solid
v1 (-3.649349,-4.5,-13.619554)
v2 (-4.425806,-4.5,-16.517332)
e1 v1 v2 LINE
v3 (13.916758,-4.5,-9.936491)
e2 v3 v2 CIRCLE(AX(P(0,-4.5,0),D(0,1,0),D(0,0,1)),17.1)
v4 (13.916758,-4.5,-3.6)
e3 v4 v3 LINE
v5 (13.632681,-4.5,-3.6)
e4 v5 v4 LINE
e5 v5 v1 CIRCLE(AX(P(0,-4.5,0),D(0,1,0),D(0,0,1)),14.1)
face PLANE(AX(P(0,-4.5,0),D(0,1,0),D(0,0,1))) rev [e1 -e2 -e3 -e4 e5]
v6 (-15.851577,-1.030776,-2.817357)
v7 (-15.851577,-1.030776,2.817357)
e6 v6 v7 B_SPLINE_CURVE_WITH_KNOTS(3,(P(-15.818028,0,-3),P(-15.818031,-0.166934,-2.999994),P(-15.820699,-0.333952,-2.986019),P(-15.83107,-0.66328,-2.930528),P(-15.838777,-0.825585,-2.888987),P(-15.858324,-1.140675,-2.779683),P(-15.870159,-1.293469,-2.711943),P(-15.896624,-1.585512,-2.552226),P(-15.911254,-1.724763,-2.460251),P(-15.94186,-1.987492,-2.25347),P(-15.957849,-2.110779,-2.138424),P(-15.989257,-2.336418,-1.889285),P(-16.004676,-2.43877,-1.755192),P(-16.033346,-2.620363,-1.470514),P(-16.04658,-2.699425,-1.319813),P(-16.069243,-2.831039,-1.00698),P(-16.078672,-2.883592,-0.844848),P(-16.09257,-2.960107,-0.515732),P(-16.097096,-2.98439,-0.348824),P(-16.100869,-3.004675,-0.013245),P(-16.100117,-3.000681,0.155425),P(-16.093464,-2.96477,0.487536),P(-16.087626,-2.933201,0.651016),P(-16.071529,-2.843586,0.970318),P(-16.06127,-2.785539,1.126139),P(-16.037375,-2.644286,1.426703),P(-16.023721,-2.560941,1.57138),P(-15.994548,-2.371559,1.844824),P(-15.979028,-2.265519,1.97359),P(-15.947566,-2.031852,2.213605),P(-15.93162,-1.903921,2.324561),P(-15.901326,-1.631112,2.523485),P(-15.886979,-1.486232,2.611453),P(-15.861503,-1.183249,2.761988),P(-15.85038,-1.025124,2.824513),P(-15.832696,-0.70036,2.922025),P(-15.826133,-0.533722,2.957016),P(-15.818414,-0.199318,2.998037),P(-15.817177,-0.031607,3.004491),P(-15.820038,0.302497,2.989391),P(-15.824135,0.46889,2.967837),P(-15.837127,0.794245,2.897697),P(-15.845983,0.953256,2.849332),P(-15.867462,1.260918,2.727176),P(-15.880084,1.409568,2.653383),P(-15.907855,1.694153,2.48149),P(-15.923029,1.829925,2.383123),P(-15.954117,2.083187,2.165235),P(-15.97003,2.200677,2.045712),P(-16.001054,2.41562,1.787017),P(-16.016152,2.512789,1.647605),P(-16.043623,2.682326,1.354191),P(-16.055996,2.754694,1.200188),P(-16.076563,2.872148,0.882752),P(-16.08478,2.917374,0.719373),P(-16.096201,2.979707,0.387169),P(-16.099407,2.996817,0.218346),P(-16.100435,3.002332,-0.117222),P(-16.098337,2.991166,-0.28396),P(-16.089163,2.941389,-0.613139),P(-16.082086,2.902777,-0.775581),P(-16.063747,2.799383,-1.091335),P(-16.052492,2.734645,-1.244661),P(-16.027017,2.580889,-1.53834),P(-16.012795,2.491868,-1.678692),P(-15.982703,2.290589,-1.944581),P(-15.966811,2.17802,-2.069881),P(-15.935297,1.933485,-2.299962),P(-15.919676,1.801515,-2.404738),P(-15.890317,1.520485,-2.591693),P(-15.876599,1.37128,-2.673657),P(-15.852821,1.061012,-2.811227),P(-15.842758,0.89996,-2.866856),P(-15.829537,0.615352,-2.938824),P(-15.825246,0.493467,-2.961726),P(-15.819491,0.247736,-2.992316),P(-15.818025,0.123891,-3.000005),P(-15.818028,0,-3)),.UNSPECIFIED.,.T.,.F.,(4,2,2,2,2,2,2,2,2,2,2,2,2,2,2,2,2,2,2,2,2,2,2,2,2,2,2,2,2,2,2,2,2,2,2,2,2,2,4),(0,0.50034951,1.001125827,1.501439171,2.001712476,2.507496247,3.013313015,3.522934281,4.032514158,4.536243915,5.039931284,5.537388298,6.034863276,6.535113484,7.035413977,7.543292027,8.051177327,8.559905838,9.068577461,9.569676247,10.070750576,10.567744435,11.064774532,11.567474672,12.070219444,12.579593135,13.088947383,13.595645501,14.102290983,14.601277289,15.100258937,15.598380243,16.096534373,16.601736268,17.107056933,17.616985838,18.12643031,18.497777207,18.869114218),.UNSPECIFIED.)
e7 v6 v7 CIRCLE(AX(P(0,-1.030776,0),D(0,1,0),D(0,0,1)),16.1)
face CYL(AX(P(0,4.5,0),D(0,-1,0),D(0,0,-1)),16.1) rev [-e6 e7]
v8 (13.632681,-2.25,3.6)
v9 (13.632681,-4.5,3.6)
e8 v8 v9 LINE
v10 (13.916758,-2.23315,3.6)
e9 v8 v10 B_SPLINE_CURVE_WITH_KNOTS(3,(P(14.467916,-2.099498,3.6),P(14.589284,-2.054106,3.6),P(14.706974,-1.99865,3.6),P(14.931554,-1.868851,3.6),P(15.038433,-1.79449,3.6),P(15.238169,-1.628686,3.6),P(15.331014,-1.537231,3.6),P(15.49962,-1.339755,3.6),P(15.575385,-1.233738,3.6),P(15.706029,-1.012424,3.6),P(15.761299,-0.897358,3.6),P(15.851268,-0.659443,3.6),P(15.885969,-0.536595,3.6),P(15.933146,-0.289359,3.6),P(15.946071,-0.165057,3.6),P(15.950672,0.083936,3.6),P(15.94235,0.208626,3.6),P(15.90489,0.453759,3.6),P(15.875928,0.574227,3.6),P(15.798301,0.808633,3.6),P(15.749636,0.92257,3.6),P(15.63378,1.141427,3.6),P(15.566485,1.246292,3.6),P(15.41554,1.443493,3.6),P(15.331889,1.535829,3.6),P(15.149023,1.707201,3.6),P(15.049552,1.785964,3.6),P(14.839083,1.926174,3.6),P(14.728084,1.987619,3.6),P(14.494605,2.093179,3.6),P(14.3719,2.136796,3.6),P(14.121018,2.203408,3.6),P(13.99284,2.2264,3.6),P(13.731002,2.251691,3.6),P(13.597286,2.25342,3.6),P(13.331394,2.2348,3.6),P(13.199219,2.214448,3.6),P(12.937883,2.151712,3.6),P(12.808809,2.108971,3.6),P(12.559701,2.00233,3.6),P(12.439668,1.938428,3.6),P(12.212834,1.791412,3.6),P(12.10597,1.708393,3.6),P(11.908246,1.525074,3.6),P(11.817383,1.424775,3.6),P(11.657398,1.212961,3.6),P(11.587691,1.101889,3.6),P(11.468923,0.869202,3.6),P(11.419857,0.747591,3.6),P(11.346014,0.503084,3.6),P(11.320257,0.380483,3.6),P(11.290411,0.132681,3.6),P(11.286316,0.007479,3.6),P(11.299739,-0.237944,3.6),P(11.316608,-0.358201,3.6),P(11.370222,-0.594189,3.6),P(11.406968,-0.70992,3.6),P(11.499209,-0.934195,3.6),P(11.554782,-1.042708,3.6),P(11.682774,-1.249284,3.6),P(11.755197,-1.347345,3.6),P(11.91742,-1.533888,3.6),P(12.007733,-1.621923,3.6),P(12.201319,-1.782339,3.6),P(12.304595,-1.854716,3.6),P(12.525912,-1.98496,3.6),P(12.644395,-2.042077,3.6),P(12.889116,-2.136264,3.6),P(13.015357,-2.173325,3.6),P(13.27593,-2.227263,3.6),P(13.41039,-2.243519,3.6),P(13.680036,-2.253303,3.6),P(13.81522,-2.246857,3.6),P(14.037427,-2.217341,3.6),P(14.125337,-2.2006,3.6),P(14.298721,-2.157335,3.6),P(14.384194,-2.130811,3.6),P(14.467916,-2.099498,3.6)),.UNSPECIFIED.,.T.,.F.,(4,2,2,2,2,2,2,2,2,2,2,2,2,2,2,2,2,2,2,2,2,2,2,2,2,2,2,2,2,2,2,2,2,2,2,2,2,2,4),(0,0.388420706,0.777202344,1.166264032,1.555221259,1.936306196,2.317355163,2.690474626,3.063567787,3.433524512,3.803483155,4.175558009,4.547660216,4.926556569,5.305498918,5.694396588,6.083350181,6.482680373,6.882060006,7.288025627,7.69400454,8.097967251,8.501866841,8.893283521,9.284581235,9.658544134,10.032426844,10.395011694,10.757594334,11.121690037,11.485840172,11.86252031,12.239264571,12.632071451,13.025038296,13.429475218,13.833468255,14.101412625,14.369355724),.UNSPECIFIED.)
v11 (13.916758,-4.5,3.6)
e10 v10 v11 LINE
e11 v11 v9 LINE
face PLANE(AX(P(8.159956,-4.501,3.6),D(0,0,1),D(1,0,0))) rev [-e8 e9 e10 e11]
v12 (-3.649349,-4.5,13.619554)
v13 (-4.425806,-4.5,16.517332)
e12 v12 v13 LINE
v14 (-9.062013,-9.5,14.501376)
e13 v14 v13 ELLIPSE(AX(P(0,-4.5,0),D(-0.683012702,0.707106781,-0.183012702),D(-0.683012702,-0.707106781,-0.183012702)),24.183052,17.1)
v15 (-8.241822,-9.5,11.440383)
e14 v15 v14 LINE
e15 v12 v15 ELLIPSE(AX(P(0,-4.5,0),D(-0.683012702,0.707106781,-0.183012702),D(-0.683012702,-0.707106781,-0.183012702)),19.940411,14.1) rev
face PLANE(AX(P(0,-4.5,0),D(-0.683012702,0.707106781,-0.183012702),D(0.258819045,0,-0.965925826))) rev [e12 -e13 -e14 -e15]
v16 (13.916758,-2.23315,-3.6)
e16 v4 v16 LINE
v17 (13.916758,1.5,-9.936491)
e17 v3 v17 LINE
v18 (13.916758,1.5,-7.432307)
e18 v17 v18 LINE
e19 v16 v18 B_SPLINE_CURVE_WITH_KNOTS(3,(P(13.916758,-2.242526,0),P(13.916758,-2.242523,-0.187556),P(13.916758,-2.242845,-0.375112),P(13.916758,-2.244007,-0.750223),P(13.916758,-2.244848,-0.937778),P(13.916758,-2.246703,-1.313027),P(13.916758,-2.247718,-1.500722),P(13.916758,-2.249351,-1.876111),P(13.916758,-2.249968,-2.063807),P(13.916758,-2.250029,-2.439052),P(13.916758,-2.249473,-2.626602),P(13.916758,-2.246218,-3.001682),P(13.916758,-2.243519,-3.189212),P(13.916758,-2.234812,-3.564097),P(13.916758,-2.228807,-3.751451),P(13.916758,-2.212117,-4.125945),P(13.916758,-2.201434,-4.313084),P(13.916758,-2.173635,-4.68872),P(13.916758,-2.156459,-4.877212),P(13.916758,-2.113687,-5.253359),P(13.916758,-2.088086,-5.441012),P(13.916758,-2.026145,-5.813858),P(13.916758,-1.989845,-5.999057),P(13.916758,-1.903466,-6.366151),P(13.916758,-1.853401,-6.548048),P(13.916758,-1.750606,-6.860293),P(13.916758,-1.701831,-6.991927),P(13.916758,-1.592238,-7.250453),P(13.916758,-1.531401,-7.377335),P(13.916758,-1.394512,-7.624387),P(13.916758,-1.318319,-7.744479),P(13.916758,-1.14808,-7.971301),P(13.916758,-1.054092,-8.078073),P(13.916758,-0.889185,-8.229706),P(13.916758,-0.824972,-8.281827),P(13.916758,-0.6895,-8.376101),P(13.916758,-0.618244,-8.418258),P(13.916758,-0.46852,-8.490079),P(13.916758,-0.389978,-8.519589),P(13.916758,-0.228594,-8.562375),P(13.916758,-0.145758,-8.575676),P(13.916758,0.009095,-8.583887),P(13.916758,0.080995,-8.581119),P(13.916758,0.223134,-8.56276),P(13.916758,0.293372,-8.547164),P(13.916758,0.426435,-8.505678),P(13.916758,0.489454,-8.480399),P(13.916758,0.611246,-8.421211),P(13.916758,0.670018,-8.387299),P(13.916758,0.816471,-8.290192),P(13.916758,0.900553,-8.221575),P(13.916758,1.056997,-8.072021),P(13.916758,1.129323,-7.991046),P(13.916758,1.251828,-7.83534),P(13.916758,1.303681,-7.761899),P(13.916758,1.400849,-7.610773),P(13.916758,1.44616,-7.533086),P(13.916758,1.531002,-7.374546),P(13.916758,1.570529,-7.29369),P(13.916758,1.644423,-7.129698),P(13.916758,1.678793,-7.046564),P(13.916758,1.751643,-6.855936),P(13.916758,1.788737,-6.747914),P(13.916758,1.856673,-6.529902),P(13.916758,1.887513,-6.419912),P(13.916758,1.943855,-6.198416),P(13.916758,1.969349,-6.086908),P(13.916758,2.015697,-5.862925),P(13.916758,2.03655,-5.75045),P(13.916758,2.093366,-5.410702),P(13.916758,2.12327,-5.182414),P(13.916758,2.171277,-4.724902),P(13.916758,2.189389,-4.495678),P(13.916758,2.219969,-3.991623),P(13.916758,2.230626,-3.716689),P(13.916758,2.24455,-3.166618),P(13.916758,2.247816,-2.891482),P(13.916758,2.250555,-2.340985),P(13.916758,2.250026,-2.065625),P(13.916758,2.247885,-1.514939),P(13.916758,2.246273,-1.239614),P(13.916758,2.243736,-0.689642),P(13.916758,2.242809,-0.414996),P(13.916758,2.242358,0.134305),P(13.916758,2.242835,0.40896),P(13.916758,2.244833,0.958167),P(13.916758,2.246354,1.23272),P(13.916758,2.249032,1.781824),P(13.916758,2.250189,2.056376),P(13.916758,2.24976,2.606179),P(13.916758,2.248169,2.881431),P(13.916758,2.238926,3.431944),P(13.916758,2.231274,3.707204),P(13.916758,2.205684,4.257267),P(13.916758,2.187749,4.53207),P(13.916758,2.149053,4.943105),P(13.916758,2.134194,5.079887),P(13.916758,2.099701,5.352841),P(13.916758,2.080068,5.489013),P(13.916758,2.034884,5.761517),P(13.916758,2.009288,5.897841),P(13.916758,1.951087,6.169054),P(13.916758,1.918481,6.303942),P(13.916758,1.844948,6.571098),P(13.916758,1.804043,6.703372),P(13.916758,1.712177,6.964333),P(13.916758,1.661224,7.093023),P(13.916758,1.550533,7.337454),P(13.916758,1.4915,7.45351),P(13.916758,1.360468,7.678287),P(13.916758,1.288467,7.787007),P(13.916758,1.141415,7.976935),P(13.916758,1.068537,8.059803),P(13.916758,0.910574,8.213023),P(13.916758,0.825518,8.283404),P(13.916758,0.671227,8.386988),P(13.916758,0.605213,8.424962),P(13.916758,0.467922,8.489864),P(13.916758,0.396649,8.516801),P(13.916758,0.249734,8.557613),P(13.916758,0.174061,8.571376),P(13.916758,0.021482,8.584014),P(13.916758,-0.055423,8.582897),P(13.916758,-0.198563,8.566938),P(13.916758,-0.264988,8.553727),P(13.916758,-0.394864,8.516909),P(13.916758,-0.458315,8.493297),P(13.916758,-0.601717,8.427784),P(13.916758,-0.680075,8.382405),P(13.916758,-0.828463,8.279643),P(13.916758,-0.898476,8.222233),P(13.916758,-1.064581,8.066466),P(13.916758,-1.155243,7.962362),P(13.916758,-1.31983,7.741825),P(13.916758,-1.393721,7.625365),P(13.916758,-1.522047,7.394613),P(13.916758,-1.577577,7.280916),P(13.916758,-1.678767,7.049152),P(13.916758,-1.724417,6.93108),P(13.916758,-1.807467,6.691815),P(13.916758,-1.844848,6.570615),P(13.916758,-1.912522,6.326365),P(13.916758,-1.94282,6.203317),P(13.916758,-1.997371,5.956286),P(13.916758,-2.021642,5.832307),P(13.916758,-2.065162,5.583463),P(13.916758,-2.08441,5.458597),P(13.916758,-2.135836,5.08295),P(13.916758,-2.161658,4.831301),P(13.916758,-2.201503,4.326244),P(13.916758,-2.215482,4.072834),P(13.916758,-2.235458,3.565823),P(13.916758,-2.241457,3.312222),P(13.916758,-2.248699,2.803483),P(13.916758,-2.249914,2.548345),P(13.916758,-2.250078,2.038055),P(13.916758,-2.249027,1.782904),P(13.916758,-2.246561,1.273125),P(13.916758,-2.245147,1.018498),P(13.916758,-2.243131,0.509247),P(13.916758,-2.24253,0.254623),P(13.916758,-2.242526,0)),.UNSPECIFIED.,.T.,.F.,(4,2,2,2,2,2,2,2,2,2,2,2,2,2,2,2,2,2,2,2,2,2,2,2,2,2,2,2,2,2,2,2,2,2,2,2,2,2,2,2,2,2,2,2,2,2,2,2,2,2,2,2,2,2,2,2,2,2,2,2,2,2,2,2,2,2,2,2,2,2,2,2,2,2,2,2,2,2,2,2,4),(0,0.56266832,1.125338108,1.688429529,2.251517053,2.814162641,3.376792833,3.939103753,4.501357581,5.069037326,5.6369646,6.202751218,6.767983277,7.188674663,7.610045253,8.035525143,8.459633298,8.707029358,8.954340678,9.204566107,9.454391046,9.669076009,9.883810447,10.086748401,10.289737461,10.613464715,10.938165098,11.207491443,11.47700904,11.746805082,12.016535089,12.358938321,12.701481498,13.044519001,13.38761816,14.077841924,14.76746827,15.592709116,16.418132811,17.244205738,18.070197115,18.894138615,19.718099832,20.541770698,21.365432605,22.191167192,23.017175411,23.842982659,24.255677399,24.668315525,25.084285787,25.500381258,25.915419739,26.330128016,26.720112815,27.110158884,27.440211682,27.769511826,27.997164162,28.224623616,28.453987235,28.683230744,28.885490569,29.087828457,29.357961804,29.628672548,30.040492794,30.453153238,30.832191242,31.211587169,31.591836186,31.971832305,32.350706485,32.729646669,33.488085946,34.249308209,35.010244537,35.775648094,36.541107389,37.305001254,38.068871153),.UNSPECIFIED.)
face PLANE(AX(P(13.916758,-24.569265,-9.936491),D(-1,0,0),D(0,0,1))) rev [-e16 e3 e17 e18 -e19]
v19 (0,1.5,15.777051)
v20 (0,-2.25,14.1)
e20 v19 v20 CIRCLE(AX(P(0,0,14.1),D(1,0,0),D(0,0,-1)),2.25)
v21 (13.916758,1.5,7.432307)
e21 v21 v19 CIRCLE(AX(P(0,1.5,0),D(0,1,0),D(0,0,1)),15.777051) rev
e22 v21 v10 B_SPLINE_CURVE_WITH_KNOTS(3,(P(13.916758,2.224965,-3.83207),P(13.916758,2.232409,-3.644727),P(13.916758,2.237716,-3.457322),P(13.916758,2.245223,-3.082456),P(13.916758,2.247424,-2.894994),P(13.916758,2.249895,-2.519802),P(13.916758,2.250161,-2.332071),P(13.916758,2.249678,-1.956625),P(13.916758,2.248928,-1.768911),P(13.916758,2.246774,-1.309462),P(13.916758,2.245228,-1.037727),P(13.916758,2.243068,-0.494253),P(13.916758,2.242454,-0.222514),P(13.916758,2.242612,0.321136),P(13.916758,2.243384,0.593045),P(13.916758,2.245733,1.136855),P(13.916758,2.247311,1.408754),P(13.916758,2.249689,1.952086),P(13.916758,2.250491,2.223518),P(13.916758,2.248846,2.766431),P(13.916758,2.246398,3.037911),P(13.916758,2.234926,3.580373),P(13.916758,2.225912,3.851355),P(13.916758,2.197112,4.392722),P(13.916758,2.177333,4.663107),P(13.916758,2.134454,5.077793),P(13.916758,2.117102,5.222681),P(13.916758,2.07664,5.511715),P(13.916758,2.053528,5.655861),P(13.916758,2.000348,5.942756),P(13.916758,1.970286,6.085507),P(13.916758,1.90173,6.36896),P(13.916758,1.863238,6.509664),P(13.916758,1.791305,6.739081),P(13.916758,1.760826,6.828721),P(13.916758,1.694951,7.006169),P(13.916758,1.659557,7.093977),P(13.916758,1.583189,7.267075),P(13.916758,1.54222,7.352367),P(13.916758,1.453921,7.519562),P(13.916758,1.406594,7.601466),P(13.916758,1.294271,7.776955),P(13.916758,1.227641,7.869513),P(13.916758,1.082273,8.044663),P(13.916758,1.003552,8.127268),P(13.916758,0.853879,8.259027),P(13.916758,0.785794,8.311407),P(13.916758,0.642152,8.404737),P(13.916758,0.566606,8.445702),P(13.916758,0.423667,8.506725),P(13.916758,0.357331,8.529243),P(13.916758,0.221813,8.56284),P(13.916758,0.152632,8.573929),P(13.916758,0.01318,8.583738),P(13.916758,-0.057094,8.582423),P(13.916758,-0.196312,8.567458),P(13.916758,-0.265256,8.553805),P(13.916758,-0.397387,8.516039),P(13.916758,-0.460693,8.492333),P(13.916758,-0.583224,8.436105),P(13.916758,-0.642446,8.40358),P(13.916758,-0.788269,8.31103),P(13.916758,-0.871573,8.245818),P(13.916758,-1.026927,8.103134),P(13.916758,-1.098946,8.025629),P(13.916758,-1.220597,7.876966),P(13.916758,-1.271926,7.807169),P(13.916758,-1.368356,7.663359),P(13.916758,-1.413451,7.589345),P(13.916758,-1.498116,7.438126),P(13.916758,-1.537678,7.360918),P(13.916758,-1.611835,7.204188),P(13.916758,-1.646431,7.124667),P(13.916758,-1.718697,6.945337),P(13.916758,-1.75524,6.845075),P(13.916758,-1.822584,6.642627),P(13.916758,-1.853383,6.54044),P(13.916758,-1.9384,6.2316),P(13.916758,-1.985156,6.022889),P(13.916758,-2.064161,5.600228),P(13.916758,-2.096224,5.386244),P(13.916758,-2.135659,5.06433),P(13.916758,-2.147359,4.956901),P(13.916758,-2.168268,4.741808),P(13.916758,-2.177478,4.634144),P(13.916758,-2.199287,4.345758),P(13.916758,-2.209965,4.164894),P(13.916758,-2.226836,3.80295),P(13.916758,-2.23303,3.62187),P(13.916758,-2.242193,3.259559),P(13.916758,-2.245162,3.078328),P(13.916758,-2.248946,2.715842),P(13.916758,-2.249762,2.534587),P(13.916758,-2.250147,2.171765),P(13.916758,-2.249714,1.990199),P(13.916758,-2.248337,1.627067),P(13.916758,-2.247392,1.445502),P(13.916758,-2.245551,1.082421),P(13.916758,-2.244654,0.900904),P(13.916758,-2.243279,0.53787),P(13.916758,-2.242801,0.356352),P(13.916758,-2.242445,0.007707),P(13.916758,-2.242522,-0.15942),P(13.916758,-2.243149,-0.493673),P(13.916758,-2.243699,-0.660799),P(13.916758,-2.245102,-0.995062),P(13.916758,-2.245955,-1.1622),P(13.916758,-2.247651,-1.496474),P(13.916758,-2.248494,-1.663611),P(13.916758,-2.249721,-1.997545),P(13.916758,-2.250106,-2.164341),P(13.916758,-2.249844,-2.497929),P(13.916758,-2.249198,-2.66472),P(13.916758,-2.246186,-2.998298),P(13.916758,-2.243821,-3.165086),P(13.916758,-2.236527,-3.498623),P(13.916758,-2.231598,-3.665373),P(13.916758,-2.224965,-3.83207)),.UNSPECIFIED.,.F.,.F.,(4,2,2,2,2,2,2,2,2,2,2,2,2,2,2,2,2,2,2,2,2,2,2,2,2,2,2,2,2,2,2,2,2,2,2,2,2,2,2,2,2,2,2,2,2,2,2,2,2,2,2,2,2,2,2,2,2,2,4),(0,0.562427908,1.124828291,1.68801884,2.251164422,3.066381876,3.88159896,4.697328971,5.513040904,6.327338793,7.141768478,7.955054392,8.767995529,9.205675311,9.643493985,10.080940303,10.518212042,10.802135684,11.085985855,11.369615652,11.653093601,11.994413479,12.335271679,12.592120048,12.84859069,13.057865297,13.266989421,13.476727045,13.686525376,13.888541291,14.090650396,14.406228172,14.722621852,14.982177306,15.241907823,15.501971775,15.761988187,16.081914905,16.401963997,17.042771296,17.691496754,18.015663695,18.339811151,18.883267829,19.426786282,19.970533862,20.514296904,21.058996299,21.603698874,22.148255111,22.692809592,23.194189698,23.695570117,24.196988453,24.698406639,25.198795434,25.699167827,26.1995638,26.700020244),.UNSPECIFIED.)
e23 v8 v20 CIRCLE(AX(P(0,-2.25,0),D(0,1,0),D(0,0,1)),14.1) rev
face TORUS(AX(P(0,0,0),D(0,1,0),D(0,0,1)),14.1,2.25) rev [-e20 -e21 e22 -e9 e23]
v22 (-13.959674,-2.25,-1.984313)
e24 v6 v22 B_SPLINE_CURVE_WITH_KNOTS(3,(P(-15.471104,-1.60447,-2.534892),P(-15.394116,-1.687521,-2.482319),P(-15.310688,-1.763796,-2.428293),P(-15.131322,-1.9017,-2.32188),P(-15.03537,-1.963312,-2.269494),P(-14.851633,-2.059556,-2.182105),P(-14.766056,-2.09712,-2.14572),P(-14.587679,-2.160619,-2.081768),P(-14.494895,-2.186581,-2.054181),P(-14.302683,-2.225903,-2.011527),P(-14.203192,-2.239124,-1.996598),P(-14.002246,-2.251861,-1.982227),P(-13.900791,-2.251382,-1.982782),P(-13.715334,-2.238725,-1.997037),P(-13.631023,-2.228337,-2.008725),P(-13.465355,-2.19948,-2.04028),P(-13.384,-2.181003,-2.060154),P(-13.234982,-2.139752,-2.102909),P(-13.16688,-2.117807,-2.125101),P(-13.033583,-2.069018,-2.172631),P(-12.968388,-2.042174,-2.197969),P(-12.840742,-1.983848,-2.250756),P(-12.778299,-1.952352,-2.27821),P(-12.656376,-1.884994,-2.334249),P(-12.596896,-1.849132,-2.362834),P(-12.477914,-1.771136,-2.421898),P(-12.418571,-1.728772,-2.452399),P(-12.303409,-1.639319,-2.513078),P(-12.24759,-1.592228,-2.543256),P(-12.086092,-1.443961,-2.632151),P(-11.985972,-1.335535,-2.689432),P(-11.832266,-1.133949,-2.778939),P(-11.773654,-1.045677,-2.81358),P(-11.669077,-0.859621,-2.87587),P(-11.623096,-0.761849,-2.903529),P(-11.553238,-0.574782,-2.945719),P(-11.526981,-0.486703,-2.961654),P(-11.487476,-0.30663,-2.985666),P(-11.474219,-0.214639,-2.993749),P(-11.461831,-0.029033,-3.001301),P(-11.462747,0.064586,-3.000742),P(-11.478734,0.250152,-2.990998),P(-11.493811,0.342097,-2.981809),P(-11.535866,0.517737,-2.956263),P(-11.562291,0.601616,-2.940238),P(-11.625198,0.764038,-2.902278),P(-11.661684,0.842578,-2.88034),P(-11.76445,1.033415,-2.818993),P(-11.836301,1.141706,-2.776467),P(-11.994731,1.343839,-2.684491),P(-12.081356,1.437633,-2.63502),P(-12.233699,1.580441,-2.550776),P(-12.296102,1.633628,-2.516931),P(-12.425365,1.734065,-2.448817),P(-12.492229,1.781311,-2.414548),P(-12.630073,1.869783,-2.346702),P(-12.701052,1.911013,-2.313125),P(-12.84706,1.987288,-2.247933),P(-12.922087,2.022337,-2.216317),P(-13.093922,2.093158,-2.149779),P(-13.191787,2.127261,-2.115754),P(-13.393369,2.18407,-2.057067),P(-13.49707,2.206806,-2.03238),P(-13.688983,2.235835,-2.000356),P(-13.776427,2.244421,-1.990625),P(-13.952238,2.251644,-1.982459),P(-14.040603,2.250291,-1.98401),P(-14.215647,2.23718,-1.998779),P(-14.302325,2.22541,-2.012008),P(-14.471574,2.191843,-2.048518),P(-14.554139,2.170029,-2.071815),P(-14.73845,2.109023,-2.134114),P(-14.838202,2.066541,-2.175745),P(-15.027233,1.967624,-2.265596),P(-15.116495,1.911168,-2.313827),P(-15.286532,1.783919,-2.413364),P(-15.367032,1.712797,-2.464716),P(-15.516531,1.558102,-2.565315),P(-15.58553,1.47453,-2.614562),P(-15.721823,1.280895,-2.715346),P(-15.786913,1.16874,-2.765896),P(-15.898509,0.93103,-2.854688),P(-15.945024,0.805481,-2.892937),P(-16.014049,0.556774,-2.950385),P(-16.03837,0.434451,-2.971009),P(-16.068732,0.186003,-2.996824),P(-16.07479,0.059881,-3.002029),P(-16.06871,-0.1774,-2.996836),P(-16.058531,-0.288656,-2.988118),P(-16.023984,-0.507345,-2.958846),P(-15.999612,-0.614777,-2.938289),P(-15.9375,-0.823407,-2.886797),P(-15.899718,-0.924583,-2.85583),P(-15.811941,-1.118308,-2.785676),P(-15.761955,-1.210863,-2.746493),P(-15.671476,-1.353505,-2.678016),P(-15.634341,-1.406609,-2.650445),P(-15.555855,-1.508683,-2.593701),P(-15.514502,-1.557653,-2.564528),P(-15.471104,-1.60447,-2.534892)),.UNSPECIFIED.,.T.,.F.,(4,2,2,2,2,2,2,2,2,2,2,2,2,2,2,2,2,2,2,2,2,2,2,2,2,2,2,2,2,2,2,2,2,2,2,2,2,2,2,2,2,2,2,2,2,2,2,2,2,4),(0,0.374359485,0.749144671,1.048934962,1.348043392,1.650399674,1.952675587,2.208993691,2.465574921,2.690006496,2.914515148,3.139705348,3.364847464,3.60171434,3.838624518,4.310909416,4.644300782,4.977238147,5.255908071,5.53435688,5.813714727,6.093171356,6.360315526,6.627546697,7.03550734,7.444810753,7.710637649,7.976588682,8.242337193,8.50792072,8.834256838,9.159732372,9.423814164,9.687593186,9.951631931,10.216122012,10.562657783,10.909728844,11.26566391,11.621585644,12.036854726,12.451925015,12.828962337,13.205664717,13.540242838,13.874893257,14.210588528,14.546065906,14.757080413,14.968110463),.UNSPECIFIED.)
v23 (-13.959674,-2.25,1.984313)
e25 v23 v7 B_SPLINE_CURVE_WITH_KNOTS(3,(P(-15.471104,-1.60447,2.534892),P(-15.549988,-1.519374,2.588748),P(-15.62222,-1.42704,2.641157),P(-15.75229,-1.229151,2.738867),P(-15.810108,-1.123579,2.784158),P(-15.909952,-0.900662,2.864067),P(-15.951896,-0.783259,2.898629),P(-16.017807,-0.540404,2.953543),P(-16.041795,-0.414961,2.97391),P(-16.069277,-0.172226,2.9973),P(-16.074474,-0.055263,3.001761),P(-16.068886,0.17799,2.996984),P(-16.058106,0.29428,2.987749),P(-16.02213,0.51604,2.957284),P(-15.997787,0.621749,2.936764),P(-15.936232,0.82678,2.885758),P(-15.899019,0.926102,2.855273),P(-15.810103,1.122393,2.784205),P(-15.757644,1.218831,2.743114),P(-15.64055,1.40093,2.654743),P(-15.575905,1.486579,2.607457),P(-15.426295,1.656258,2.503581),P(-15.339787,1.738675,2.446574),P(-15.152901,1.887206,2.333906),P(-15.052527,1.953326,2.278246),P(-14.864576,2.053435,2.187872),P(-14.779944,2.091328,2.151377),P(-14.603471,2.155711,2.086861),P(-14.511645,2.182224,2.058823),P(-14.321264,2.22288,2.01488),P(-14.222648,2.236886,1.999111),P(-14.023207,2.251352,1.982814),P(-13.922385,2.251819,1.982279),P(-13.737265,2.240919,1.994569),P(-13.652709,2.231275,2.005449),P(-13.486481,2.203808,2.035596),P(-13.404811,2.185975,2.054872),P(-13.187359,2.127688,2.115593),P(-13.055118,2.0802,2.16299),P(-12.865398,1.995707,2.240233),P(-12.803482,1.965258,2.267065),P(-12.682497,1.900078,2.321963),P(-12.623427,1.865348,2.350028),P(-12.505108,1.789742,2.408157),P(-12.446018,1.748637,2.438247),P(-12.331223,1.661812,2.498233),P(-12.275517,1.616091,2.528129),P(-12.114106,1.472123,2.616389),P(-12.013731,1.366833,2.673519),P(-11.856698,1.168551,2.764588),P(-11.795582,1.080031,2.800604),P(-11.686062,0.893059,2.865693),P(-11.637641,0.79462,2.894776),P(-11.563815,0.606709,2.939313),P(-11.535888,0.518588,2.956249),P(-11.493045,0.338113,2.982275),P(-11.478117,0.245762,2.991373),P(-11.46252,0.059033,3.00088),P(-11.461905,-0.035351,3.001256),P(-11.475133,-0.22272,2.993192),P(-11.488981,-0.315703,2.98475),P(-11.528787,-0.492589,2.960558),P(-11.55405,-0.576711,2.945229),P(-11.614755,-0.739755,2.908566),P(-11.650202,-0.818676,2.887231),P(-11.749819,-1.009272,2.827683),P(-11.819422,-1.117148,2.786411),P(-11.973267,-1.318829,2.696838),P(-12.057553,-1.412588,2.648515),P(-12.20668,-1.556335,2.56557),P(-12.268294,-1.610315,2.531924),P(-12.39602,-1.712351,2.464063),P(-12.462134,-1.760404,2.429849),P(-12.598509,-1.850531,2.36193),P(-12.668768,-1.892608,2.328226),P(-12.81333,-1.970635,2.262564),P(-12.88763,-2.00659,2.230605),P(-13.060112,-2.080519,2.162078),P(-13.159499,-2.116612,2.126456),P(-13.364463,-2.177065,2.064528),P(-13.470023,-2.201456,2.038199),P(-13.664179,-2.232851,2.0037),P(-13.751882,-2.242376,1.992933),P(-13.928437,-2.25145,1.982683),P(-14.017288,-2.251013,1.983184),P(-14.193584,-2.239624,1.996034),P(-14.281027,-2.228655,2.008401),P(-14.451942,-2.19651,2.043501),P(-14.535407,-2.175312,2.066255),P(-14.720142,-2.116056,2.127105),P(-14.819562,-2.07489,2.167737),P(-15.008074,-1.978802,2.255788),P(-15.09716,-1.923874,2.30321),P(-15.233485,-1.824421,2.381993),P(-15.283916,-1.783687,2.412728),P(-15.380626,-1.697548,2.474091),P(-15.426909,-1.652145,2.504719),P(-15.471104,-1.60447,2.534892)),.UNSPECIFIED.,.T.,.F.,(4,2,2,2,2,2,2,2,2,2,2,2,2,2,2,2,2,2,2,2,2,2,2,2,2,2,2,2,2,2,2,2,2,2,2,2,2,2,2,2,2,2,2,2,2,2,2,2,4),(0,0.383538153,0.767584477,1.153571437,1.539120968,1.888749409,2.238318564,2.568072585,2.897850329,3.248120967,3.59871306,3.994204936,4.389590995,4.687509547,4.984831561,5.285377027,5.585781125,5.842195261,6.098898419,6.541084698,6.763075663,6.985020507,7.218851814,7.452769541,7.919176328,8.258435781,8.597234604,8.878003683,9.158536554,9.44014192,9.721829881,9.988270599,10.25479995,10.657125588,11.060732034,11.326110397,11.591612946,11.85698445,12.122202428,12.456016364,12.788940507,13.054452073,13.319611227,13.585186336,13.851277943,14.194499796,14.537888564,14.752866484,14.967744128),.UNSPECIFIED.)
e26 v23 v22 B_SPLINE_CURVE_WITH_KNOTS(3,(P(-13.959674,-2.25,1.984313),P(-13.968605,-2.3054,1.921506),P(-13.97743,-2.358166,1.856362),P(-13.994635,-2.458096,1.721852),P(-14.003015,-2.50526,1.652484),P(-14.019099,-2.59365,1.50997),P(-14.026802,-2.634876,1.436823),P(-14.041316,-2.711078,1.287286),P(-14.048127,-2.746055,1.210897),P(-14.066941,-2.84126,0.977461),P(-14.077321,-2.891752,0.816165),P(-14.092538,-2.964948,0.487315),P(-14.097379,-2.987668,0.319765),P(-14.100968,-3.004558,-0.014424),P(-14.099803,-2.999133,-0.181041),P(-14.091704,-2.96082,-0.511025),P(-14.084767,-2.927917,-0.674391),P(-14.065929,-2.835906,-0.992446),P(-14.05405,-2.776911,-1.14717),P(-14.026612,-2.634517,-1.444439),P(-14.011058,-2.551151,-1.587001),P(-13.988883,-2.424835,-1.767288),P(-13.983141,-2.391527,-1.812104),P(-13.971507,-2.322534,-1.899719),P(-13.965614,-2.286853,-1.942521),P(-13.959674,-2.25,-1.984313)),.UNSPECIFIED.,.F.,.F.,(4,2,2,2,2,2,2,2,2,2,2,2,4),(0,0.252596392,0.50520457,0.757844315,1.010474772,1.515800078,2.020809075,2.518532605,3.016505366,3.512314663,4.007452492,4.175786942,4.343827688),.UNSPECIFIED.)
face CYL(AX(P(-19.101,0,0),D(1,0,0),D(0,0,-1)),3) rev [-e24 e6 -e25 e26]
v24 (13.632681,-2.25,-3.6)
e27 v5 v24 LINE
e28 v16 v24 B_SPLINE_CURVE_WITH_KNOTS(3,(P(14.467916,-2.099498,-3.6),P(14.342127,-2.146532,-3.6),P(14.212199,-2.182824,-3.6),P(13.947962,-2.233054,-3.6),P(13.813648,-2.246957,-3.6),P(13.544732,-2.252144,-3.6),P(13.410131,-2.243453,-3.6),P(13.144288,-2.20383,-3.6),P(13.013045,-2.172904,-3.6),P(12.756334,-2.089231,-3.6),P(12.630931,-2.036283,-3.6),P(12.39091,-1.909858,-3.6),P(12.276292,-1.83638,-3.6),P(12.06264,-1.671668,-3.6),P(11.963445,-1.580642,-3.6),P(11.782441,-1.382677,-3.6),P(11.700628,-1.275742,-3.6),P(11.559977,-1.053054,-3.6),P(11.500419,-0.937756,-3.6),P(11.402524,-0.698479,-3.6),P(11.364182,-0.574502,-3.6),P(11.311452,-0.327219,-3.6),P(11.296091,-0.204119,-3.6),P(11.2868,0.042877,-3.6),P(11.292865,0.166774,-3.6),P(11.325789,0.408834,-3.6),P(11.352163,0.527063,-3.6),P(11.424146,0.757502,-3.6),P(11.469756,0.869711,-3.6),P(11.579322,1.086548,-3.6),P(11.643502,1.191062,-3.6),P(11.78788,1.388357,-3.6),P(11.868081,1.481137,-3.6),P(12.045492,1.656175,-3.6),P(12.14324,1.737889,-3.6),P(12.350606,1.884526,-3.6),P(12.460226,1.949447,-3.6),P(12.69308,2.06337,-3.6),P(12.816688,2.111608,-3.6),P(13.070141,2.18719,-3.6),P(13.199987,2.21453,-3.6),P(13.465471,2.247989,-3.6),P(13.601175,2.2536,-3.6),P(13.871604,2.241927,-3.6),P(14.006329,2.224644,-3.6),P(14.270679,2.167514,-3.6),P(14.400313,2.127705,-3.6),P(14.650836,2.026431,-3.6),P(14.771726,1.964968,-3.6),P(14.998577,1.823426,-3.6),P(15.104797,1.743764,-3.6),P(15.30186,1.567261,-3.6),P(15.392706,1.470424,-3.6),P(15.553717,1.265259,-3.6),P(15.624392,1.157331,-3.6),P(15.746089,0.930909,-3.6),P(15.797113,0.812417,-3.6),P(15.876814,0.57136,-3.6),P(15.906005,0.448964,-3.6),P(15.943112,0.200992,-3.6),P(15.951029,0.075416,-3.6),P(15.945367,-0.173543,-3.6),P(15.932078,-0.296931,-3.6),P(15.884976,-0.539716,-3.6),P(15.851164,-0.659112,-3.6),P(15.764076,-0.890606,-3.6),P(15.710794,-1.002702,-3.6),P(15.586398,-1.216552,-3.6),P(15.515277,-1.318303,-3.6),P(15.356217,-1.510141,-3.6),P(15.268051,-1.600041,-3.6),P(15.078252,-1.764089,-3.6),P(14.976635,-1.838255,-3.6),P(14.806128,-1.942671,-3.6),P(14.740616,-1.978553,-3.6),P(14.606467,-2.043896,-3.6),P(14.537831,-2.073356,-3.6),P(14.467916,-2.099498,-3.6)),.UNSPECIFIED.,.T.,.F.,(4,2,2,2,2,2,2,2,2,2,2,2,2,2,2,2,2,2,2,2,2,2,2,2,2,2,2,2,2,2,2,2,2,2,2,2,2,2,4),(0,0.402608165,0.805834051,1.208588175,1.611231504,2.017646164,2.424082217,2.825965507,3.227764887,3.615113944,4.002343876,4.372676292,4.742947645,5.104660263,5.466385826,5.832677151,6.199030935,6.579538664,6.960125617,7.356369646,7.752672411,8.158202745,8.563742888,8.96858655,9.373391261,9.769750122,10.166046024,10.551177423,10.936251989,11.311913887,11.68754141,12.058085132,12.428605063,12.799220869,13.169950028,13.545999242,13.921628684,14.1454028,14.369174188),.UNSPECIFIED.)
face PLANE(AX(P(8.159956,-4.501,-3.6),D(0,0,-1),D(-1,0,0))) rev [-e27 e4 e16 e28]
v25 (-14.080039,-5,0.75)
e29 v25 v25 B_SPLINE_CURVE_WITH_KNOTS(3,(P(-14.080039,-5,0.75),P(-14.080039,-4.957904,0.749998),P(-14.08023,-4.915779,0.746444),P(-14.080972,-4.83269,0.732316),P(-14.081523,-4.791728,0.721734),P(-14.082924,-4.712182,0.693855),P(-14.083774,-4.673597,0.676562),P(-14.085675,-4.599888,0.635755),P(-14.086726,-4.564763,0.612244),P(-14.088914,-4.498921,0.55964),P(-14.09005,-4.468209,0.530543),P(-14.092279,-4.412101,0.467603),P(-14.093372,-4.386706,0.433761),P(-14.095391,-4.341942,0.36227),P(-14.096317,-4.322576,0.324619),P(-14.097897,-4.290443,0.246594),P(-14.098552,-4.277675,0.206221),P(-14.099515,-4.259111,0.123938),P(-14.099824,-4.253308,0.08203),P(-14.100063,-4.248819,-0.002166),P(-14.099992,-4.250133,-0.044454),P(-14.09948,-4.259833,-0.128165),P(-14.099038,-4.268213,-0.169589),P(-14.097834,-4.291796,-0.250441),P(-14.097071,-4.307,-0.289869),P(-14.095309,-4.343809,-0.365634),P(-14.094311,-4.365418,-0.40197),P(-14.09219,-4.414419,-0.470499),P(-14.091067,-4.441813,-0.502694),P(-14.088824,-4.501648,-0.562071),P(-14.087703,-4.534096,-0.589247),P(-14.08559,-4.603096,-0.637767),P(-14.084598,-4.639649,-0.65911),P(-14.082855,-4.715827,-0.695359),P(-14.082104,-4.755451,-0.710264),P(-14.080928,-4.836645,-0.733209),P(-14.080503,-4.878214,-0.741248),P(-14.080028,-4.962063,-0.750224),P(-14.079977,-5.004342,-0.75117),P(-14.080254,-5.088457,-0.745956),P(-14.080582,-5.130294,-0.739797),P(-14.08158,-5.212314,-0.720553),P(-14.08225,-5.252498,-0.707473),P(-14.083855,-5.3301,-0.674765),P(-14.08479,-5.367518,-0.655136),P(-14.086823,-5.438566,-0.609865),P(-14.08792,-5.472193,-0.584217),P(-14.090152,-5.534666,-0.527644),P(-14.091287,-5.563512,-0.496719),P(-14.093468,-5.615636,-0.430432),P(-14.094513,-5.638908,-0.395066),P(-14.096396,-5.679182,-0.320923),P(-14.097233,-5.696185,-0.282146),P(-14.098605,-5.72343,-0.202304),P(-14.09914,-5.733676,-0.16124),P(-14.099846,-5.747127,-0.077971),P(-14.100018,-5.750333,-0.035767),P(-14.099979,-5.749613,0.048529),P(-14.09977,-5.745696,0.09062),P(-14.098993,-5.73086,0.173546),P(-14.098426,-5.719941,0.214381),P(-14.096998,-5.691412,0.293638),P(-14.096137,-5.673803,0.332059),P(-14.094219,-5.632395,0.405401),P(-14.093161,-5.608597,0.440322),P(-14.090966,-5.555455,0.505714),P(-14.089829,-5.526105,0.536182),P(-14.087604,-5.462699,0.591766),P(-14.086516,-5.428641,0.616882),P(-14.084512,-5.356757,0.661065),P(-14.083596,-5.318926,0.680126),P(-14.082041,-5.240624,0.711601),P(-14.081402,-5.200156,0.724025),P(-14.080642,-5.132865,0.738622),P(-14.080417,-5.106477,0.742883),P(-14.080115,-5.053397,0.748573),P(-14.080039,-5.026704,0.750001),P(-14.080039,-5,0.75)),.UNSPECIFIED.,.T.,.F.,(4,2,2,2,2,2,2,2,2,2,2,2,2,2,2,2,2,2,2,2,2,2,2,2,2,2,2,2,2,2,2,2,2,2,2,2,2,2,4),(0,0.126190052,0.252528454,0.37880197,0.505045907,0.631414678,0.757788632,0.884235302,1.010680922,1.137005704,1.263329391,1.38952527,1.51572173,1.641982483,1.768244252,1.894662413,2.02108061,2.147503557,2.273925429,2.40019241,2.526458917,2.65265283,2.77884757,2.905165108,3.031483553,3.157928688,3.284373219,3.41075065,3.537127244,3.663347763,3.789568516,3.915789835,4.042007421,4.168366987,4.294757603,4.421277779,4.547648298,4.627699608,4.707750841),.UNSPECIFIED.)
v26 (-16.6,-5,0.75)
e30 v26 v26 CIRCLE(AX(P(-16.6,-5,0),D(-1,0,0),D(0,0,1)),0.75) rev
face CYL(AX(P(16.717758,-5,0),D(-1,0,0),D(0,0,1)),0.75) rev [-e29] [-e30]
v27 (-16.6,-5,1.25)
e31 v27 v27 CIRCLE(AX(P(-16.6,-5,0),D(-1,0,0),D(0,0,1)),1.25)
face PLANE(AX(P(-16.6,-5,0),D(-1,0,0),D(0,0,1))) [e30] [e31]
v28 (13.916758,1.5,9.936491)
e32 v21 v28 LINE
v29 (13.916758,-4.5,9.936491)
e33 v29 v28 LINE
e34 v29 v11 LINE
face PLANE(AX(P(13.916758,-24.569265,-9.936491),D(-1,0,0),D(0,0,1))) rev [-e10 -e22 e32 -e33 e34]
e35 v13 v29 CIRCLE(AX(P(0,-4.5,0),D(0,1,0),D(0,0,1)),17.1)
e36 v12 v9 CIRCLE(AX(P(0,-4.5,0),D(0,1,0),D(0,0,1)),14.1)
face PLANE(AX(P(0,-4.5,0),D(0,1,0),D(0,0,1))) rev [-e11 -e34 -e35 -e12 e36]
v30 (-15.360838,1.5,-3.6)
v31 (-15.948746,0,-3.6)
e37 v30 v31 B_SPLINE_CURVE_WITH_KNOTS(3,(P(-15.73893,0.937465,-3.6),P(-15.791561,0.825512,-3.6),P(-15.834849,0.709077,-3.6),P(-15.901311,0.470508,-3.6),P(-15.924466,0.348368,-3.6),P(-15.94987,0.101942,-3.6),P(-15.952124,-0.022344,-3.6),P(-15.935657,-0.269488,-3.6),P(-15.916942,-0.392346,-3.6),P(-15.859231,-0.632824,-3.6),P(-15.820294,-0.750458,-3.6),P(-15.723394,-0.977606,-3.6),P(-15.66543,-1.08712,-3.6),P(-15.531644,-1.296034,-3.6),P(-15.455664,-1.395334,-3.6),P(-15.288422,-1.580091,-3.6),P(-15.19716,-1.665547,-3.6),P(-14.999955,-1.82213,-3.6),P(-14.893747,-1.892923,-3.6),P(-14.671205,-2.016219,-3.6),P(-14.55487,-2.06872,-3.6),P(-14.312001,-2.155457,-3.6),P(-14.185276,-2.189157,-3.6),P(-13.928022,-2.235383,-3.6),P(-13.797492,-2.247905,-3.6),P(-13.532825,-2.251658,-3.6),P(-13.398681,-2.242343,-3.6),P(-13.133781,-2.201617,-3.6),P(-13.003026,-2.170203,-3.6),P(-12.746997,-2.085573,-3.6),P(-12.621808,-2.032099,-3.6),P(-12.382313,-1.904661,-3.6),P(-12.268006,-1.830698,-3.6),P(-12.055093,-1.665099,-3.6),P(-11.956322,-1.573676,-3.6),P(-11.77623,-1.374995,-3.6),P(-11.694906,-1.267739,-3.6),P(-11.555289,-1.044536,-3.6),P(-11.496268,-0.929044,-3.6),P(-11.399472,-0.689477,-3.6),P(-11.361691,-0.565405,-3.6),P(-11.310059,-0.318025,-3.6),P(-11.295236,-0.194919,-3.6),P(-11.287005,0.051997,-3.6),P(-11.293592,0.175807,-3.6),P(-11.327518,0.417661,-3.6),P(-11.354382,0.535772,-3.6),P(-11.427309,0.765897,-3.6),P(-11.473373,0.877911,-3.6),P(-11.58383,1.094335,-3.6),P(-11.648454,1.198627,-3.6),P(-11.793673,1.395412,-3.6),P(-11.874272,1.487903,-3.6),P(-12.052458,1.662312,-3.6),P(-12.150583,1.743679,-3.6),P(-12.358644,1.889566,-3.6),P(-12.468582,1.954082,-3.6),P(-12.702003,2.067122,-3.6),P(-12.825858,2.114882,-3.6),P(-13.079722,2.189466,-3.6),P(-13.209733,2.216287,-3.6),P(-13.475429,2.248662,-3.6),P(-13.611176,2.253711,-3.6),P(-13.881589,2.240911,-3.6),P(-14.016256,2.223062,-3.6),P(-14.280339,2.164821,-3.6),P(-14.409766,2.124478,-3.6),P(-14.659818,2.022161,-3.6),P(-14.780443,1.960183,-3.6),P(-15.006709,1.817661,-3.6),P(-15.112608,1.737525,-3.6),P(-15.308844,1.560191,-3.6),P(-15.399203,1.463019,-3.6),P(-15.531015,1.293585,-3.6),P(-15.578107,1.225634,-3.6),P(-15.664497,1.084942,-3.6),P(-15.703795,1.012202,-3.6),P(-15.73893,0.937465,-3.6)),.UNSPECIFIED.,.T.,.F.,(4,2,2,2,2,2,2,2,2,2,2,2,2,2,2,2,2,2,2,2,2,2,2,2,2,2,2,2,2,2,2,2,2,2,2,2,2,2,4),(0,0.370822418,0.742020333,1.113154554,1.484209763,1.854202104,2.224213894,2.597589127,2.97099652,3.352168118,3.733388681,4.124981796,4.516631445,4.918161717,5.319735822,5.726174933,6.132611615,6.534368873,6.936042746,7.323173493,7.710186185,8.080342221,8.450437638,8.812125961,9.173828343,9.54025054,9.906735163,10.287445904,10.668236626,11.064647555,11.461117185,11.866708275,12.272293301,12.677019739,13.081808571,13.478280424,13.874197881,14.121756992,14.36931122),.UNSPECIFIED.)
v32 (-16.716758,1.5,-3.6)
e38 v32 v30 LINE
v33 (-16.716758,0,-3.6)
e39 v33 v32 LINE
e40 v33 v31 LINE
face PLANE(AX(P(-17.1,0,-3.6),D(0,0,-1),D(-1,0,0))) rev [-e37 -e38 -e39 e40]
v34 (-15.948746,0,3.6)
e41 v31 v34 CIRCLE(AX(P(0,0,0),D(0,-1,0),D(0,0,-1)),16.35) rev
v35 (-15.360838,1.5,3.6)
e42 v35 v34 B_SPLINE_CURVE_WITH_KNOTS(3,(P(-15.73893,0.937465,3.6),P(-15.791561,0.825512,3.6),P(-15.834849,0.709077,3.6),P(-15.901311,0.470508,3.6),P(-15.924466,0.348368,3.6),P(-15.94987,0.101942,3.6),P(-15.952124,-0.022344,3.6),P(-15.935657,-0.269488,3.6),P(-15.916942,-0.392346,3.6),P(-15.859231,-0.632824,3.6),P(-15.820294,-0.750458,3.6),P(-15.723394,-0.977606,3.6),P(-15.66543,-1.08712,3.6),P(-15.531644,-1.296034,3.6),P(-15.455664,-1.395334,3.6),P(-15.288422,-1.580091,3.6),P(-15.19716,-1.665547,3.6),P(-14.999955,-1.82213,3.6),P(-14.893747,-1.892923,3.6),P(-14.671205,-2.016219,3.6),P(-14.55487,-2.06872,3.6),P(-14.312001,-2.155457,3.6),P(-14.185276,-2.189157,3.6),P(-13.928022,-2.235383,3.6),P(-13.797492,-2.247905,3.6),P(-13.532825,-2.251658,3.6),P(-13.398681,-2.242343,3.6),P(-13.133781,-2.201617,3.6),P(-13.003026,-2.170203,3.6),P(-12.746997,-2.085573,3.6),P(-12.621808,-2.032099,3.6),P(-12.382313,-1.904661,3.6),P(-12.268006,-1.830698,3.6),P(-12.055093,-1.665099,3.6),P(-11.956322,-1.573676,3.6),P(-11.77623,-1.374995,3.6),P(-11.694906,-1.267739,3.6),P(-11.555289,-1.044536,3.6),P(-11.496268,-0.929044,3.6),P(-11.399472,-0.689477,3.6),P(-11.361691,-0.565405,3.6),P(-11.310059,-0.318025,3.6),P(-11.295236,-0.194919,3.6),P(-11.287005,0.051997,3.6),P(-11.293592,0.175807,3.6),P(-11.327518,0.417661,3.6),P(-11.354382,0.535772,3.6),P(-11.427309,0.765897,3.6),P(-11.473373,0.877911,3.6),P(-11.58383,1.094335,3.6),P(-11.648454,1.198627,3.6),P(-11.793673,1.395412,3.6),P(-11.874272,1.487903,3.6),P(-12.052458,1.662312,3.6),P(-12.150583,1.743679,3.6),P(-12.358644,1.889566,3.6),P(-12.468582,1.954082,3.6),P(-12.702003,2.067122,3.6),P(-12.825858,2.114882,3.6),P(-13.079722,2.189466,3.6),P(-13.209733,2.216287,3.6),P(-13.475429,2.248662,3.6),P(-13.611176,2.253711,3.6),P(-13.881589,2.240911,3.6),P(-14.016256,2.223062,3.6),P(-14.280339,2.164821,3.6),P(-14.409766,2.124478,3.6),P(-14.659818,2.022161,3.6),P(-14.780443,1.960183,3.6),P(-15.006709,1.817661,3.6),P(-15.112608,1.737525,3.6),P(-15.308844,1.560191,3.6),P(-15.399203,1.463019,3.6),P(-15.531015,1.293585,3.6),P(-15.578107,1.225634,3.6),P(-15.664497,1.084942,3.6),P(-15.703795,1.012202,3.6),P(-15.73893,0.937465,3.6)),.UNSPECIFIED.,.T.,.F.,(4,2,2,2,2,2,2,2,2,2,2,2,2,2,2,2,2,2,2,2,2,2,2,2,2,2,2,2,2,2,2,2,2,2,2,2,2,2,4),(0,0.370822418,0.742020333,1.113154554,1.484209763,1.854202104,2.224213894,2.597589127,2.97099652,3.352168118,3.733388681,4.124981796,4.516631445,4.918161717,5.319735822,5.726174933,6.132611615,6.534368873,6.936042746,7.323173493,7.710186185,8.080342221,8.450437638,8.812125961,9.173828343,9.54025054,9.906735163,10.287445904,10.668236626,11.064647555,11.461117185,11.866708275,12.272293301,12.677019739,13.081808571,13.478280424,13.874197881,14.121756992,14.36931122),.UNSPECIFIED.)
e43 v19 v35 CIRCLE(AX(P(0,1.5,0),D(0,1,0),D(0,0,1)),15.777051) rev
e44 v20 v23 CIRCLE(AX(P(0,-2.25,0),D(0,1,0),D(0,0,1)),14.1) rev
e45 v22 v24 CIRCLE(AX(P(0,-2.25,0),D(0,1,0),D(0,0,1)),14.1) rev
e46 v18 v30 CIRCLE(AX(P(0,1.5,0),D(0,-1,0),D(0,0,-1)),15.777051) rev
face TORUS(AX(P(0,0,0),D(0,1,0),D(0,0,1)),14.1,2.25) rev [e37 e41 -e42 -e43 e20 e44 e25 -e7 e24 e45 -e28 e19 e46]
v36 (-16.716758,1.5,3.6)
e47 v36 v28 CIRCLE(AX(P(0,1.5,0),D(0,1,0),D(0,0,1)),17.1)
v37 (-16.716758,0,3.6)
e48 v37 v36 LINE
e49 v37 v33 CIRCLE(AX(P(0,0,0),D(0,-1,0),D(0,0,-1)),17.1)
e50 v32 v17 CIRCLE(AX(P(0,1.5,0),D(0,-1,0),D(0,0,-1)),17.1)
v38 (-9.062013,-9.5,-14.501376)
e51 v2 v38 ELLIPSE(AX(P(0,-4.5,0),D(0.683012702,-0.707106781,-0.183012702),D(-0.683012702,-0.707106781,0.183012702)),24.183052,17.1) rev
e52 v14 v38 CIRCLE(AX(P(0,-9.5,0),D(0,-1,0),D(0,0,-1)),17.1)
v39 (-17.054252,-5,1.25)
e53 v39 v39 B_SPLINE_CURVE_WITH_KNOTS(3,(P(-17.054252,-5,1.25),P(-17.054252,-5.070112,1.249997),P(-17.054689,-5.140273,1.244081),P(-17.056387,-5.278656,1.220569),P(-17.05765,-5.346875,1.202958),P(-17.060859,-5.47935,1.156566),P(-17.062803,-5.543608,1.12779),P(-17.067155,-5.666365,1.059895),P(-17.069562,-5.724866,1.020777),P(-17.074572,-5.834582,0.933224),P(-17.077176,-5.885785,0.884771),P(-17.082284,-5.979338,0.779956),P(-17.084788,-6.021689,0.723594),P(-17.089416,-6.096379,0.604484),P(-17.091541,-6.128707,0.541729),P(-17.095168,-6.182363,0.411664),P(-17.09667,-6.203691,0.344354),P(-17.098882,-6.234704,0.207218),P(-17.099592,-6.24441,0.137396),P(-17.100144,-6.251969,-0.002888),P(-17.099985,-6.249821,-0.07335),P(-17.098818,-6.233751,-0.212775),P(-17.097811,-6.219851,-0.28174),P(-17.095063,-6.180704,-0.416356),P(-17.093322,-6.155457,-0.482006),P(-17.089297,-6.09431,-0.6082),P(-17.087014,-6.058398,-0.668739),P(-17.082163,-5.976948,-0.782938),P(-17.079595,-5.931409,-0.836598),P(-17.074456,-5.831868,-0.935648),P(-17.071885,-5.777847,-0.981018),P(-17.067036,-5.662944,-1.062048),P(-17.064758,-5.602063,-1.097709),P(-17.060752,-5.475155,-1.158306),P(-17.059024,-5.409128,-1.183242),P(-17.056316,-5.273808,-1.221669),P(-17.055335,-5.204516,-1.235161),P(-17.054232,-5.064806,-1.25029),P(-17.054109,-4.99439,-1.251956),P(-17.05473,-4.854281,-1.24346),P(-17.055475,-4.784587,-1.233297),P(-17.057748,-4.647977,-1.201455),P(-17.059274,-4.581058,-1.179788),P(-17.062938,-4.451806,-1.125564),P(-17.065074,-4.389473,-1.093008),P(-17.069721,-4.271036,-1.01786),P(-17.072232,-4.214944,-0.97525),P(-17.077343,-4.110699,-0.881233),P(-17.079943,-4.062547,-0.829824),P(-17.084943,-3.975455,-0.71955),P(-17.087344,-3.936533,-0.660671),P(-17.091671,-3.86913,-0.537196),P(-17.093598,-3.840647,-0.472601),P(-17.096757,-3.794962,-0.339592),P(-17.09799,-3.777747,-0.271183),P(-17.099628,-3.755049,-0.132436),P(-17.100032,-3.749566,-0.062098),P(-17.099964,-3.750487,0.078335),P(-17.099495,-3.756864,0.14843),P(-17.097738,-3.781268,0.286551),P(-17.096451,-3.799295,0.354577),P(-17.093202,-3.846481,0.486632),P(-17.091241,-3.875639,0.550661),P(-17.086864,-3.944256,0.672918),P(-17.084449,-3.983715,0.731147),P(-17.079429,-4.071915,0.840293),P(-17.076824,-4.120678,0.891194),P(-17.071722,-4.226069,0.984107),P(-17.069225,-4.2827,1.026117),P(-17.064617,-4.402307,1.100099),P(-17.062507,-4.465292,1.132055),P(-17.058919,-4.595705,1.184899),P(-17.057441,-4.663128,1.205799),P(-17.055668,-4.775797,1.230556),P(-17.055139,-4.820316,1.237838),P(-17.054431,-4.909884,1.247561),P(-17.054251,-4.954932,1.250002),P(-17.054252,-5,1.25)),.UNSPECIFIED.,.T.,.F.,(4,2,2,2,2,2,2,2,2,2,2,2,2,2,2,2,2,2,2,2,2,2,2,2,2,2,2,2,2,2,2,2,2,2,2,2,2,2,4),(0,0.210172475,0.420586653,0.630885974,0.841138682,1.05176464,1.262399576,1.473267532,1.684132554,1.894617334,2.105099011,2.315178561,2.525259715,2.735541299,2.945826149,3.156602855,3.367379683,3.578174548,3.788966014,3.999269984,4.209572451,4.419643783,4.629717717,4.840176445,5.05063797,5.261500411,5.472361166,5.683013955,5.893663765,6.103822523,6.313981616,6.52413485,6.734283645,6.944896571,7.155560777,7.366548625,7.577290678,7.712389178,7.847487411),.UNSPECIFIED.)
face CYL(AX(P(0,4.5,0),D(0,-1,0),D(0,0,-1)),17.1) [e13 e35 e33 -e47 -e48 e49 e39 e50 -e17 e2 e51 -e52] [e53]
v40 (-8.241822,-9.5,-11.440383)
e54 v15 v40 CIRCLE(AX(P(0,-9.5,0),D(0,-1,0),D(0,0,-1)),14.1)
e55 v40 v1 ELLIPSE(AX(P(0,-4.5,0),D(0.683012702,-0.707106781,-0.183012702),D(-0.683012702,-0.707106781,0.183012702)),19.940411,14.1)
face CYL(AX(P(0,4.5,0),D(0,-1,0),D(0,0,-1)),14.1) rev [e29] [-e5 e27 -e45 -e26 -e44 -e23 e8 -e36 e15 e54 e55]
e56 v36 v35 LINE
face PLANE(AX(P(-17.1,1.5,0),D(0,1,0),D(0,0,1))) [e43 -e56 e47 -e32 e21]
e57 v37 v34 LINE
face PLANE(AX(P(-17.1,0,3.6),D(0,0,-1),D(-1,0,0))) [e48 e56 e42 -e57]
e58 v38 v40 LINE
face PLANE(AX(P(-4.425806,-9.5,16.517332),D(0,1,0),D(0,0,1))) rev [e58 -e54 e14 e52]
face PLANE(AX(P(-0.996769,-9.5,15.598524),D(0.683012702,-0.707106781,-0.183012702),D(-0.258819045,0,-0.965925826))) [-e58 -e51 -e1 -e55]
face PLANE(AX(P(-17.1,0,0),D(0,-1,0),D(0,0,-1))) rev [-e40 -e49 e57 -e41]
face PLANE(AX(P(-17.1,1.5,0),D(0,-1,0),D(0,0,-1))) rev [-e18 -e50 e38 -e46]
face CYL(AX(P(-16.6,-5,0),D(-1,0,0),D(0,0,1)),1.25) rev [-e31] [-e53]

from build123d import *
from build123d.topology import SkipClean

# Parameters (mm, degrees)
CROQUIS1_R                 = 17.1
CROQUIS1_R_2               = 14.1
SALIENTE_EXTRUIR1_DEPTH    = 4.5
CORTAR_EXTRUIR1_REACH      = 27.803
CROQUIS2_W                 = 15.420651877
CROQUIS2_H                 = 7.2
CROQUIS54_W                = 3
CROQUIS54_H                = 19
REVOLUCI_N1_ANGLE          = 150
CORTAR_BARRER2_PROFILE_R   = 2.25
CHAFL_N3_SIZE              = 5
CORTAR_EXTRUIR2_REACH      = 27.982
CORTAR_EXTRUIR2_END_RADIUS = 16.1
CROQUIS61_R                = 3
CORTAR_EXTRUIR3_DEPTH      = 26.982109266
CORTAR_EXTRUIR3_DEPTH_BACK = 26.982109266
CORTAR_EXTRUIR4_REACH      = 41.067
CORTAR_EXTRUIR4_END_RADIUS = 14.1
CROQUIS63_R                = 0.75
CROQUIS64_R                = 1.25
CORTAR_EXTRUIR5_DEPTH      = 0.5
CORTAR_EXTRUIR6_START      = -11
CROQUIS65_W                = 2.8
CROQUIS65_H                = 19.872981168
CORTAR_EXTRUIR6_DEPTH      = 11


with BuildPart() as part:
    # Croquis1 → Saliente-Extruir1 (new, symmetric)
    with BuildSketch(Plane(origin=(0, 0, 0), x_dir=(1, 0, 0), z_dir=(0, 1, 0))):
        with Locations(Location((0, 0, 0), (0, 0, 270))):
            Circle(CROQUIS1_R)
        with Locations(Location((0, 0, 0), (0, 0, 270))):
            Circle(CROQUIS1_R_2, mode=Mode.SUBTRACT)
    extrude(amount=SALIENTE_EXTRUIR1_DEPTH, both=True)

    # Croquis2 → Cortar-Extruir1 (cut, up to next)
    with BuildSketch(Plane(origin=(0, 4.5, 0), x_dir=(1, 0, 0), z_dir=(0, 1, 0)), mode=Mode.PRIVATE) as cortar_extruir1_sk1:
        with Locations((15.870282115, 0)):
            Rectangle(CROQUIS2_W, CROQUIS2_H)
    cortar_extruir1_tool1 = extrude(cortar_extruir1_sk1.sketch, amount=-CORTAR_EXTRUIR1_REACH, mode=Mode.PRIVATE) & part.part
    add(cortar_extruir1_tool1.solids().sort_by_distance((15.870282, 4.5, 0))[0], mode=Mode.SUBTRACT)

    # Croquis54 → Revolución1 (revolve, symmetric)
    with SkipClean():  # the faces are left unmerged after this step: merging them gives an invalid solid
        with BuildSketch(Plane.XY) as revoluci_n1_sk:
            with Locations((-15.6, 0)):
                Rectangle(CROQUIS54_W, CROQUIS54_H)
        revolve(axis=Axis((0, -13.582020258, 0), (0, 1, 0)), revolution_arc=REVOLUCI_N1_ANGLE / 2)
        revolve(revoluci_n1_sk.sketch, axis=Axis((0, -13.582020258, 0), (0, -1, 0)), revolution_arc=REVOLUCI_N1_ANGLE / 2)
    add(part.part.scale(1), mode=Mode.REPLACE)  # the faces are merged on a copy

    # Cortar-Barrer2: sweep along a path in Croquis12
    with BuildLine(Plane(origin=(0, 0, 0), x_dir=(1, 0, 0), z_dir=(0, 1, 0))) as cortar_barrer2_path:
        CenterArc((0, 0), 14.1, 0, 360)
    # Cortar-Barrer2 profile (on start of the path) → Cortar-Barrer2 (sweep, cut)
    with BuildSketch(Plane(origin=(14.1, 0, 0), x_dir=(-1, 0, 0), z_dir=(0, 0, -1))):
        Circle(CORTAR_BARRER2_PROFILE_R)
    sweep(path=cortar_barrer2_path.line, mode=Mode.SUBTRACT)

    # Chaflán3
    chafl_n3_edges = [part.edges().sort_by_distance(p)[0] for p in [
        (-4.037577104, -9.5, -15.06844289),
        (-4.037577104, 9.5, -15.06844289),
        (-4.037577104, -9.5, 15.06844289),
        (-4.037577104, 9.5, 15.06844289),
    ]]
    chamfer(chafl_n3_edges, length=CHAFL_N3_SIZE - 0.0001)  # a hair under: the kernel refuses the full size

    # Cortar-Extruir2: up to this cylinder (the profile starts inside it)
    cortar_extruir2_end = Plane(origin=(0, 0, 0), z_dir=(0, -1, 0)) * Cylinder(CORTAR_EXTRUIR2_END_RADIUS, 89.164, mode=Mode.PRIVATE)
    # Croquis61 → Cortar-Extruir2 (cut, up to the surface)
    with BuildSketch(Plane(origin=(0, 0, 0), x_dir=(0, 0, -1), z_dir=(1, 0, 0)), mode=Mode.PRIVATE) as cortar_extruir2_sk1:
        Circle(CROQUIS61_R)
    cortar_extruir2_tool1 = extrude(cortar_extruir2_sk1.sketch, amount=-CORTAR_EXTRUIR2_REACH, mode=Mode.PRIVATE) & cortar_extruir2_end
    add(cortar_extruir2_tool1.solids().sort_by_distance((0, 0, 0))[0], mode=Mode.SUBTRACT)

    # Croquis62 → Cortar-Extruir3 (cut, two sides: drawn at the far end of the back side and taken through both)
    with BuildSketch(Plane(origin=(0, 0, 0), x_dir=(0, 0, -1), z_dir=(1, 0, 0)).offset(-CORTAR_EXTRUIR3_DEPTH_BACK)):
        Polygon((-3.6, 1.5), (-3.6, 0), (3.6, 0), (3.6, 1.5), (19.353781031, 1.5), (19.353781031, 12.340609049), (-20.692074401, 12.340609049), (-20.692074401, 1.5), align=None)
    extrude(amount=CORTAR_EXTRUIR3_DEPTH + CORTAR_EXTRUIR3_DEPTH_BACK, mode=Mode.SUBTRACT)

    # Cortar-Extruir4: up to this cylinder (the profile starts outside it)
    with SkipClean():  # the faces are left unmerged after this step: merging them gives an invalid solid
        cortar_extruir4_end = Plane(origin=(0, -5, 0), z_dir=(0, -1, 0)) * Cylinder(CORTAR_EXTRUIR4_END_RADIUS, 111.334, mode=Mode.PRIVATE)
        # Croquis63 → Cortar-Extruir4 (cut, up to the surface)
        with BuildSketch(Plane(origin=(-17.1, 0, 0), x_dir=(0, -1, 0), z_dir=(-1, 0, 0)), mode=Mode.PRIVATE) as cortar_extruir4_sk1:
            with Locations(Location((5, 0, 0), (0, 0, 90))):
                Circle(CROQUIS63_R)
        cortar_extruir4_tool1 = extrude(cortar_extruir4_sk1.sketch, amount=-CORTAR_EXTRUIR4_REACH, mode=Mode.PRIVATE) - cortar_extruir4_end
        add(cortar_extruir4_tool1.solids().sort_by_distance((-17.1, -5, 0))[0], mode=Mode.SUBTRACT)

    # Croquis64 → Cortar-Extruir5 (cut)
    with SkipClean():  # the faces are left unmerged after this step: merging them gives an invalid solid
        with BuildSketch(Plane(origin=(-17.1, 0, 0), x_dir=(0, -1, 0), z_dir=(-1, 0, 0))):
            with Locations(Location((5, 0, 0), (0, 0, 90))):
                Circle(CROQUIS64_R)
        extrude(amount=-CORTAR_EXTRUIR5_DEPTH, mode=Mode.SUBTRACT)

    # Croquis65 → Cortar-Extruir6 (cut)
    with SkipClean():  # the faces are left unmerged after this step: merging them gives an invalid solid
        with BuildSketch(Plane(origin=(0, 1.5, 0), x_dir=(1, 0, 0), z_dir=(0, 1, 0)).offset(CORTAR_EXTRUIR6_START)):
            with Locations((15.316758059, 0)):
                Rectangle(CROQUIS65_W, CROQUIS65_H)
        extrude(amount=CORTAR_EXTRUIR6_DEPTH, mode=Mode.SUBTRACT)


solid = part.part
